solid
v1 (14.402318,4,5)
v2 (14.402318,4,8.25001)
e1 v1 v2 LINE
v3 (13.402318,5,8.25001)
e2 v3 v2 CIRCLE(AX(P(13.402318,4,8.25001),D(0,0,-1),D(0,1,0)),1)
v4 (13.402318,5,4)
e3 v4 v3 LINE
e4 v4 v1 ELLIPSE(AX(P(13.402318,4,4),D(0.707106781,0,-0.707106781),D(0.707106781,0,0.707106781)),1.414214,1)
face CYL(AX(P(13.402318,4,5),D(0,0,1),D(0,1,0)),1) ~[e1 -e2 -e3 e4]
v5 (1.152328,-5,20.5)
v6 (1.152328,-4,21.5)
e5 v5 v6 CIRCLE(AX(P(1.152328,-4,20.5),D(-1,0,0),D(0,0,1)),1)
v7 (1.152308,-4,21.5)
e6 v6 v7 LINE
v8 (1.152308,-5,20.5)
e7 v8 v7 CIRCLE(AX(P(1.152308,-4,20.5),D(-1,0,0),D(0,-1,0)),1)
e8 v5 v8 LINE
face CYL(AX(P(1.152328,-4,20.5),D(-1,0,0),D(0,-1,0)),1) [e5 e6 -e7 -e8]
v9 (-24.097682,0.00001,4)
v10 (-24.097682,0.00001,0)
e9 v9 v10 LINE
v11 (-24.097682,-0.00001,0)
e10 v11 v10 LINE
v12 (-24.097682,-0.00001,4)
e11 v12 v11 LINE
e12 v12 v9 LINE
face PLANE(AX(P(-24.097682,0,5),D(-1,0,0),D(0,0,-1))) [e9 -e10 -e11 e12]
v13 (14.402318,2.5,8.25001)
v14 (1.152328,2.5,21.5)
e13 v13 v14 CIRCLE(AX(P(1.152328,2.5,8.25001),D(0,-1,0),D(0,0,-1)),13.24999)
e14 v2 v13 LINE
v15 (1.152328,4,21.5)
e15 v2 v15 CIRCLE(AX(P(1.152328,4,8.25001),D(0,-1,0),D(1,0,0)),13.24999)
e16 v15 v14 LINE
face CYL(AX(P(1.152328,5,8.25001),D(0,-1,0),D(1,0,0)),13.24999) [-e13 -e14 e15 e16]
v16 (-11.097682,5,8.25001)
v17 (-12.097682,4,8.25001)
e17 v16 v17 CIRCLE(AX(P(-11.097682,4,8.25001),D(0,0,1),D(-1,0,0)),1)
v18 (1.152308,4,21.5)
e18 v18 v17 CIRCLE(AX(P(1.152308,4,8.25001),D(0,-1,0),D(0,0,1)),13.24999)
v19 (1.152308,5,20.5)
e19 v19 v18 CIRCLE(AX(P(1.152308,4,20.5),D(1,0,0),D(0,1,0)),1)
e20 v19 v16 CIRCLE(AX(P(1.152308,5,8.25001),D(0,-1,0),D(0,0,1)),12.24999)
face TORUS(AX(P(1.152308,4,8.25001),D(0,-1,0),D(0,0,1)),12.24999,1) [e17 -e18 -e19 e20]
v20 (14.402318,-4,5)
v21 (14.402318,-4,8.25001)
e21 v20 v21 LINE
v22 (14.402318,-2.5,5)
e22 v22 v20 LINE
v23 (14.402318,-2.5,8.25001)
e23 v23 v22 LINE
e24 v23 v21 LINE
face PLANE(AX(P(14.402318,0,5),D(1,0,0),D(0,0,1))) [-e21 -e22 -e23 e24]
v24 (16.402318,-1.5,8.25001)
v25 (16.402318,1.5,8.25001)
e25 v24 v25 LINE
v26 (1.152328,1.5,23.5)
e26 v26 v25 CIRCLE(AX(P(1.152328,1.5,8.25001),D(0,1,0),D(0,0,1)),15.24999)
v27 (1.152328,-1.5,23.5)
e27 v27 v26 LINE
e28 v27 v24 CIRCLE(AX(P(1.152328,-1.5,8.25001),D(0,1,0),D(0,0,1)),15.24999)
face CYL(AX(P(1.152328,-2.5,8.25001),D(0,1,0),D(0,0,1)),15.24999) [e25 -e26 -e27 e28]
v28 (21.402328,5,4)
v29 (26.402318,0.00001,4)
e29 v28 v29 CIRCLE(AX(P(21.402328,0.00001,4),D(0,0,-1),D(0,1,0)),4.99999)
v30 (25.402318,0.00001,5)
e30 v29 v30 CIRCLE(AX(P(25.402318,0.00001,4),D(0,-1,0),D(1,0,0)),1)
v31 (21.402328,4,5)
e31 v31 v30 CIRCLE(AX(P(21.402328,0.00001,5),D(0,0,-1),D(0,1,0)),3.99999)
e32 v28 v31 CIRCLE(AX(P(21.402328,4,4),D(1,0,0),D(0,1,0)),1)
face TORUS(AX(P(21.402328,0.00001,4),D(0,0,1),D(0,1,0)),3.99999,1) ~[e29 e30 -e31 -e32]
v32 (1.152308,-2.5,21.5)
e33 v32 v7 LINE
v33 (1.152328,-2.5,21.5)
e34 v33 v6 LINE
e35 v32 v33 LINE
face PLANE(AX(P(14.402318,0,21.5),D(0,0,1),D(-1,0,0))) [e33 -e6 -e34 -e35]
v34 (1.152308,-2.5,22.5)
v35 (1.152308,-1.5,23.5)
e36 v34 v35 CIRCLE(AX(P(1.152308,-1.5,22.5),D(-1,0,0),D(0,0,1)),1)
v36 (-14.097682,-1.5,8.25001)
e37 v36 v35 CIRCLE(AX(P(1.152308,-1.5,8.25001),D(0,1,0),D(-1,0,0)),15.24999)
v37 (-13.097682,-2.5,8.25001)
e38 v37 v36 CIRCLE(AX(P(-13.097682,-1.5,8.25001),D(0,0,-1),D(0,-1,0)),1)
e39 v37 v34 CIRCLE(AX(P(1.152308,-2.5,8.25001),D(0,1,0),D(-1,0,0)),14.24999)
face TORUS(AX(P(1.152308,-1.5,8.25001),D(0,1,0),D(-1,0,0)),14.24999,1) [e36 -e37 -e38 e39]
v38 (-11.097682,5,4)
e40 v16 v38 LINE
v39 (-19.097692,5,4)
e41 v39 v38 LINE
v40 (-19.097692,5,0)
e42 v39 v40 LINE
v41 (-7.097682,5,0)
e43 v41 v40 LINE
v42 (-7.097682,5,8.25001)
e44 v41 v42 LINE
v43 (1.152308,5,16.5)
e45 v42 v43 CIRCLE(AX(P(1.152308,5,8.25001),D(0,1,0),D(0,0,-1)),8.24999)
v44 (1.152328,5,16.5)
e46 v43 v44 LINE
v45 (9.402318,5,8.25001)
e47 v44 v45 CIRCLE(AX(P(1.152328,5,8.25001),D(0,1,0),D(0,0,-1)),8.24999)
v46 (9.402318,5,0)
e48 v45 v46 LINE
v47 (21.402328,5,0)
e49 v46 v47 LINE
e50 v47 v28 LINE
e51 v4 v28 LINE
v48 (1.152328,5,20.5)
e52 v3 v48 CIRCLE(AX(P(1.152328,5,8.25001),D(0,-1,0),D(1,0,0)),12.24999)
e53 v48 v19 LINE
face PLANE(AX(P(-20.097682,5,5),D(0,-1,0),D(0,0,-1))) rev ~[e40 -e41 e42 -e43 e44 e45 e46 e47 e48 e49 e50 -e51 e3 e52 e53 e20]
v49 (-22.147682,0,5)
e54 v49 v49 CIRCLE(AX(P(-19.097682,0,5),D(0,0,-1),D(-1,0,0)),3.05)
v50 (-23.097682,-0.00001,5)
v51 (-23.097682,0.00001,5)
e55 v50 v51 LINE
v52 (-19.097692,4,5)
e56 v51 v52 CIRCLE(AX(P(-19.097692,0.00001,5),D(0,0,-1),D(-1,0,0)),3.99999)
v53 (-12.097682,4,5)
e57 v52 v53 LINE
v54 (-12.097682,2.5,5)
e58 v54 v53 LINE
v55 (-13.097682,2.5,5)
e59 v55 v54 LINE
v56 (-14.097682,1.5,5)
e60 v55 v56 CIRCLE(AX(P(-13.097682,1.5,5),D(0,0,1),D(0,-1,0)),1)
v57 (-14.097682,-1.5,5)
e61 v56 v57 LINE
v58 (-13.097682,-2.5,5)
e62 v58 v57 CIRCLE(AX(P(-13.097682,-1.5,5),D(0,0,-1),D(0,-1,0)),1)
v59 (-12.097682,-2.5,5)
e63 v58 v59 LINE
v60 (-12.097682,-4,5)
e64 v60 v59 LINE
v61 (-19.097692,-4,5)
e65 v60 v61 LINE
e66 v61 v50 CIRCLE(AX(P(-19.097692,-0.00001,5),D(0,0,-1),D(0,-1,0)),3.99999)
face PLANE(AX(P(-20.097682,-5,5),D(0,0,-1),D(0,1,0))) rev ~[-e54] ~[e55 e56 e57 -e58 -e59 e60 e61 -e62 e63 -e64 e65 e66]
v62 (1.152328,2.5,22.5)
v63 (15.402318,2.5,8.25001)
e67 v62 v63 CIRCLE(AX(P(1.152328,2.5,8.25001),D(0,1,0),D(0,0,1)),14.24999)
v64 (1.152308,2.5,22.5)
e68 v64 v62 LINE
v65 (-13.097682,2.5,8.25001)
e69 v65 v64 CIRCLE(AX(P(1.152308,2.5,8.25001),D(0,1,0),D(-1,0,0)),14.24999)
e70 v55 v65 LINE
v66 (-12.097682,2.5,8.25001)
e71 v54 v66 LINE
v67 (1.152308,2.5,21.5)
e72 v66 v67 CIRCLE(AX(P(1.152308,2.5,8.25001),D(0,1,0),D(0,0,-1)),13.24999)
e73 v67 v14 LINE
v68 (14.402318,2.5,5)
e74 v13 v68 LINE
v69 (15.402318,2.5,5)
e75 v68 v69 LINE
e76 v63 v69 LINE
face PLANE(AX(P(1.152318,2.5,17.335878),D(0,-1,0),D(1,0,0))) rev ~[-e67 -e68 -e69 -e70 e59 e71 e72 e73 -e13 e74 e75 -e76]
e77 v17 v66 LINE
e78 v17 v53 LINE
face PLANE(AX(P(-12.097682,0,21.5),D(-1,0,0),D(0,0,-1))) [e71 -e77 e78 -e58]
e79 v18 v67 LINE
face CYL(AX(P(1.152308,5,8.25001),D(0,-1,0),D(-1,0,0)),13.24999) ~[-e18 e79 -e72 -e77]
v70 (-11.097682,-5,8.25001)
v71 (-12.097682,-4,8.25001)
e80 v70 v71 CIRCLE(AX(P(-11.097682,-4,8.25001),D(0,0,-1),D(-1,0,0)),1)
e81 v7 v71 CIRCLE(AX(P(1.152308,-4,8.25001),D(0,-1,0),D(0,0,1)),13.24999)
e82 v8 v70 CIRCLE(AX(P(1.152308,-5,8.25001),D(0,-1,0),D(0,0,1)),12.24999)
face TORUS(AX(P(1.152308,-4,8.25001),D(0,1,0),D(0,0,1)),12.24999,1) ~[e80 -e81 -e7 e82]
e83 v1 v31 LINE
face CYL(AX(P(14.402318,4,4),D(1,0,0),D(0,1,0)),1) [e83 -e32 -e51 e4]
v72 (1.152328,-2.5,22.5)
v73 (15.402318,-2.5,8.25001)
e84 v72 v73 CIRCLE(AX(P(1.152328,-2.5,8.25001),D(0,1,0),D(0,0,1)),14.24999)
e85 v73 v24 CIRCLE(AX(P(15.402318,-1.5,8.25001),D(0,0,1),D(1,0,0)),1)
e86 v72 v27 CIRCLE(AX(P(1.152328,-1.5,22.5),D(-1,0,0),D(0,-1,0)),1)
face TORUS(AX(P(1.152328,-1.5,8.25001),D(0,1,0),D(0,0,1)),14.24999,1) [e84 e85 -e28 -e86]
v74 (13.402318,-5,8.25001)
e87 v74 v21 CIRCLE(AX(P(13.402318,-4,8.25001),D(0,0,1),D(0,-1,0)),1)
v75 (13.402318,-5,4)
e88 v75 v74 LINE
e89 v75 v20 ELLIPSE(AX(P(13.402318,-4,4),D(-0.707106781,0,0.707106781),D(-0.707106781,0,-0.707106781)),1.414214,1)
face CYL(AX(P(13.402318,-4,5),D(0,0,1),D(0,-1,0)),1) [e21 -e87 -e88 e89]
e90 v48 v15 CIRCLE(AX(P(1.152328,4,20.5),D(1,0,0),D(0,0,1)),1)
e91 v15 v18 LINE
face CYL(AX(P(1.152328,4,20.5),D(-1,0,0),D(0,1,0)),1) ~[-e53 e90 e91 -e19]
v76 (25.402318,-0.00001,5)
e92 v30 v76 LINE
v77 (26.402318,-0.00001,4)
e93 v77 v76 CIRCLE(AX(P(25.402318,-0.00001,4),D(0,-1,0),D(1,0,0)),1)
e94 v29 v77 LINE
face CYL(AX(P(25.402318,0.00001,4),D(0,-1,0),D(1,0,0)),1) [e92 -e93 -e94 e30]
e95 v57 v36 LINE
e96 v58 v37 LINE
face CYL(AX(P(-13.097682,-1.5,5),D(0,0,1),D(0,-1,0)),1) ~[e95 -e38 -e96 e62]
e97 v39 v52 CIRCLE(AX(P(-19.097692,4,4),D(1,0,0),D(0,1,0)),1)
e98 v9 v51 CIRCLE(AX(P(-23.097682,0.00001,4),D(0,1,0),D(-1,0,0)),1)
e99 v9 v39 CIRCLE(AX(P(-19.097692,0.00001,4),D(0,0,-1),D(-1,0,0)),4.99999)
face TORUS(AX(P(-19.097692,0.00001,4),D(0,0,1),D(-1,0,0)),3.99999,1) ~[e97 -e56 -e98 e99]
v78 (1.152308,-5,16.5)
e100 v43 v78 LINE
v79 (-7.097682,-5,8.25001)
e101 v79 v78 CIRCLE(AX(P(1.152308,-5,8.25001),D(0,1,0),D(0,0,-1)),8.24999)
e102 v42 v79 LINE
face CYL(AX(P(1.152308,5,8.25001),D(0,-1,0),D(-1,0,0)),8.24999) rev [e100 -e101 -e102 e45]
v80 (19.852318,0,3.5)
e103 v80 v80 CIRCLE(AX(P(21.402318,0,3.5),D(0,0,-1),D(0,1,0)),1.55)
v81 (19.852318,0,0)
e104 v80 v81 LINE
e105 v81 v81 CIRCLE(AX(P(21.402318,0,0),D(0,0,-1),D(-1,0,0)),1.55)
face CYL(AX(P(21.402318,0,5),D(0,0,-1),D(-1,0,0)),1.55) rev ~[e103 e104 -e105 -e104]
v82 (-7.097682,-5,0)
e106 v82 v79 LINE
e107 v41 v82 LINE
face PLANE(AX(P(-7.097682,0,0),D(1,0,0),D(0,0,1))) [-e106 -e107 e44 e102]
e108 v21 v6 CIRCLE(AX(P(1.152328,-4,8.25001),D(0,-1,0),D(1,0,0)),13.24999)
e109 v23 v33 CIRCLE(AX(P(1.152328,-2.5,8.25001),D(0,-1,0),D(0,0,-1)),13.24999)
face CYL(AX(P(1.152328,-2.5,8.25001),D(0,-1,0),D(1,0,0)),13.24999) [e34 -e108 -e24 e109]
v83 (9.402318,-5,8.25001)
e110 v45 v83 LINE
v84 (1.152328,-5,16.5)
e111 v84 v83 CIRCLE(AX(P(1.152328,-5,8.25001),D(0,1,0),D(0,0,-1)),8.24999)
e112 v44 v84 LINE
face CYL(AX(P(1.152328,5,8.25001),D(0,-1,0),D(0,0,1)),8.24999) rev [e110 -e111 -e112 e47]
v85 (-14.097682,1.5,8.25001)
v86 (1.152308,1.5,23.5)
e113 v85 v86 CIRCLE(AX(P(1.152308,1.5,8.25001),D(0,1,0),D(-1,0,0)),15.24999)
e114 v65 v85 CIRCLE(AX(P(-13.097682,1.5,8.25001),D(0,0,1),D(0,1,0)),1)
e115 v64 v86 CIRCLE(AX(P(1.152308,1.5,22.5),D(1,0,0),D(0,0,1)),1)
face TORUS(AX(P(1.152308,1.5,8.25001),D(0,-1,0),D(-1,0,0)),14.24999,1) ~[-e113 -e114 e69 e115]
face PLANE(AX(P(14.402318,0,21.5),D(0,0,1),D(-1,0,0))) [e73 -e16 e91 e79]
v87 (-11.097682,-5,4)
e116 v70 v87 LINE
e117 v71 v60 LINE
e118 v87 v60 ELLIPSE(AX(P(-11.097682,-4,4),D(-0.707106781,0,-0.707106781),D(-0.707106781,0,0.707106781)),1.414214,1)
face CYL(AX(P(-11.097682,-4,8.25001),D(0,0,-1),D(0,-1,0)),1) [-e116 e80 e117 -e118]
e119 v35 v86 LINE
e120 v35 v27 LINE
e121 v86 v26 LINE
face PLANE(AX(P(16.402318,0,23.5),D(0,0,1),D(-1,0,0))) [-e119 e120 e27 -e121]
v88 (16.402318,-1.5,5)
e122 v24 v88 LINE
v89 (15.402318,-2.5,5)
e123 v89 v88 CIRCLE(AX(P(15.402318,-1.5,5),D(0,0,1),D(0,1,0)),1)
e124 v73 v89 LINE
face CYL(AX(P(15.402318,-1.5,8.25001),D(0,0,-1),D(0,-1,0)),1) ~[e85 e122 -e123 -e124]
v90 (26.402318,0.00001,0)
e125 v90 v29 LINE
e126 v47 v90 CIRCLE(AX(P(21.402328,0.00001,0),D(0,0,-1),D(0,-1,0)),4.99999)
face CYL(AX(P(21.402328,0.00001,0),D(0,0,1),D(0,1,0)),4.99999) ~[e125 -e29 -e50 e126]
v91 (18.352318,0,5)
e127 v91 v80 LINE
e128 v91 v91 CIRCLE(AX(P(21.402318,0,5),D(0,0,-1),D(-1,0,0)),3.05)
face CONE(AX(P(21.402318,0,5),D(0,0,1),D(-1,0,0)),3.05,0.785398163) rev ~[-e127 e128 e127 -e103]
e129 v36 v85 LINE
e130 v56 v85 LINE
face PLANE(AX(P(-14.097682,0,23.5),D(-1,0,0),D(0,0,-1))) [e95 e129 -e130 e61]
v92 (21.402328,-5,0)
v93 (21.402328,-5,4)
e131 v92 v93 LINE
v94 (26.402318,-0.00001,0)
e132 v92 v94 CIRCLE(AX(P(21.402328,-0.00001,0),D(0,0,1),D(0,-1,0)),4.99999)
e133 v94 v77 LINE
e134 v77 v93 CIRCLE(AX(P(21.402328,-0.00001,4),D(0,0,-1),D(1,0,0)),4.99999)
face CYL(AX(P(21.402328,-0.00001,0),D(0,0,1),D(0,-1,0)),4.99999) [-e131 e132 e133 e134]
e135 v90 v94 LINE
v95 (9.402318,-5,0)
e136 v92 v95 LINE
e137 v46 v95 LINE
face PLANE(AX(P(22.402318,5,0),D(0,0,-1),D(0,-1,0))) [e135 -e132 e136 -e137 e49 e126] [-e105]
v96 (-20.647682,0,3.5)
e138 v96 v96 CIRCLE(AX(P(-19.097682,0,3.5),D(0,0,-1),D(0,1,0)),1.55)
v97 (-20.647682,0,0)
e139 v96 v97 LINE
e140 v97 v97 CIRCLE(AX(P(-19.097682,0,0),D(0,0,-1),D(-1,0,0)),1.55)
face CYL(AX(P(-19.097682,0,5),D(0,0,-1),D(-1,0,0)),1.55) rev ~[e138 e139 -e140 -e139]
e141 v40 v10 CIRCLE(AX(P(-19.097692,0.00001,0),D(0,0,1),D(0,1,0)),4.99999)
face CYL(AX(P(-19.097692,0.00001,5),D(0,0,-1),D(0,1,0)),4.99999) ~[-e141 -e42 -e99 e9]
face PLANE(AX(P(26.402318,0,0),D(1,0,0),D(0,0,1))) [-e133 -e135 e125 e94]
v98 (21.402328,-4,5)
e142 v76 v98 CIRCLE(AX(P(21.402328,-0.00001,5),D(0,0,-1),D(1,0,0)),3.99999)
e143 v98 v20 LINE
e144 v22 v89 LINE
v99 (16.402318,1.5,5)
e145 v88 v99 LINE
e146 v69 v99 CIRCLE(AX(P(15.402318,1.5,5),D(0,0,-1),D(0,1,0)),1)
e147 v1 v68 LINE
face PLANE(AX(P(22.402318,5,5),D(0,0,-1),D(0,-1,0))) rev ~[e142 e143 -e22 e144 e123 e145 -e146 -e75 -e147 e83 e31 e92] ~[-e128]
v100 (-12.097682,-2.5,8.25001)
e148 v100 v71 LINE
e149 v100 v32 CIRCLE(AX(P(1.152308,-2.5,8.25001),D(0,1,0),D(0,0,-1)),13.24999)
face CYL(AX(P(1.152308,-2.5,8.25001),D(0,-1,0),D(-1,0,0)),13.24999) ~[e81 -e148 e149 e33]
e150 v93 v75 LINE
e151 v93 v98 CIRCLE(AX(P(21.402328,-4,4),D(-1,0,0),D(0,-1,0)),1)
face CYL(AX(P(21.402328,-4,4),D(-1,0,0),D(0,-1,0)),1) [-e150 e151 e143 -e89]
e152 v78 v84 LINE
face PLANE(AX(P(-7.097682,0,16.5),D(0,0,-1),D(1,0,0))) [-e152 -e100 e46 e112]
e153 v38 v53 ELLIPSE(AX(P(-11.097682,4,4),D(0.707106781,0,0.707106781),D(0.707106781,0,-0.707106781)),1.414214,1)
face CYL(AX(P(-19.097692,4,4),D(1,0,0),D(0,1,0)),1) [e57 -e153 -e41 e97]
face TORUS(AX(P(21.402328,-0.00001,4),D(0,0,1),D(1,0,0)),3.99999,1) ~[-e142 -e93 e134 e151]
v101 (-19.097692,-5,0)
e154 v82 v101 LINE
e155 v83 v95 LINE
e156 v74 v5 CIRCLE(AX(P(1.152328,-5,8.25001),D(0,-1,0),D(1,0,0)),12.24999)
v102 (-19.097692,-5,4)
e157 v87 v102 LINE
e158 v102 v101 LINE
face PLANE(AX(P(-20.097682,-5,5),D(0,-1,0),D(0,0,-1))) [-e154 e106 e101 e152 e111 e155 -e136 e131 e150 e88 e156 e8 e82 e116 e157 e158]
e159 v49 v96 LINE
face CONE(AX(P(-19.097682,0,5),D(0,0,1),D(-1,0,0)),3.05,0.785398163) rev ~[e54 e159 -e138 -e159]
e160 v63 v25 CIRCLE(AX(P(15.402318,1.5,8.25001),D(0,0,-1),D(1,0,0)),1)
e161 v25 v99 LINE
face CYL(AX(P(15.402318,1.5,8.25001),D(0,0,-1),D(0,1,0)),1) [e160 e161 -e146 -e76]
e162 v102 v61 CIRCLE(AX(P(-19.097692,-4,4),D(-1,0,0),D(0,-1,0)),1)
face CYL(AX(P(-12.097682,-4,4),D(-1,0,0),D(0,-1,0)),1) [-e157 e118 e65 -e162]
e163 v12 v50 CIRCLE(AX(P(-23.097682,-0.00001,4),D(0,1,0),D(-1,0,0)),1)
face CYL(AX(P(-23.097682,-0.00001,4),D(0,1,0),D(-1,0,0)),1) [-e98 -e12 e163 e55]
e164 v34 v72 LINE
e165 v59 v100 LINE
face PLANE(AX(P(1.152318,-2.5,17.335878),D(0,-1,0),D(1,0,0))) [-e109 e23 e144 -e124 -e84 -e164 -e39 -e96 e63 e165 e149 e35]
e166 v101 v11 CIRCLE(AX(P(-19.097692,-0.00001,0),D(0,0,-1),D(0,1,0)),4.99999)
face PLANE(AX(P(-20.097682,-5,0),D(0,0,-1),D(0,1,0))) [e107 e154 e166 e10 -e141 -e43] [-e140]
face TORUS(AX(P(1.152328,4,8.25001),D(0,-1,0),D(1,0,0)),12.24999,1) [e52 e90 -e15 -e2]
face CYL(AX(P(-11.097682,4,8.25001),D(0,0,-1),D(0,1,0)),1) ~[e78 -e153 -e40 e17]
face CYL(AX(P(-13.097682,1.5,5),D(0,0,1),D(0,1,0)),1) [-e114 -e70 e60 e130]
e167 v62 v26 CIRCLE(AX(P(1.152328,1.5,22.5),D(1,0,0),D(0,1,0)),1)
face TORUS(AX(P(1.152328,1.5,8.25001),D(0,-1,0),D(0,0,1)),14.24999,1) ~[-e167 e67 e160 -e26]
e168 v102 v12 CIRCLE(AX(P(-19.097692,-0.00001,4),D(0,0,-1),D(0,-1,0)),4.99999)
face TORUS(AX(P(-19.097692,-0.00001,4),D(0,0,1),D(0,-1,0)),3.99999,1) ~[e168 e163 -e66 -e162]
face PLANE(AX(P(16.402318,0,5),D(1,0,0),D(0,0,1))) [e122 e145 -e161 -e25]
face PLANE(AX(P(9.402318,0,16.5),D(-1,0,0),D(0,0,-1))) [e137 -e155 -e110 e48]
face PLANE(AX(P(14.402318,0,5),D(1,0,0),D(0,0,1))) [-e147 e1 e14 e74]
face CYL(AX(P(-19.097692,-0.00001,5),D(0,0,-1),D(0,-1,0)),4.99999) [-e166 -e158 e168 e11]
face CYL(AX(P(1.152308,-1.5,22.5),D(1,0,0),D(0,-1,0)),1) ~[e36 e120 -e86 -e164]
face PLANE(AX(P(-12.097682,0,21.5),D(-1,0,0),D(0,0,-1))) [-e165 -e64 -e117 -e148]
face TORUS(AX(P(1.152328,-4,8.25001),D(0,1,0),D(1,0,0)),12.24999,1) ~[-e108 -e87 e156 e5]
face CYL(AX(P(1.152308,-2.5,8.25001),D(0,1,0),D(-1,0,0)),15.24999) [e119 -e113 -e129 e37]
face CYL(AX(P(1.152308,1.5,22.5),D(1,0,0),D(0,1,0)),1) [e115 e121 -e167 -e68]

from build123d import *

# Parameters (mm, degrees)
F1_DEPTH        = 5
F2_DEPTH        = 2.5
F3_R            = 8.24999
F4_R            = 13.24999
F5_R            = 13.24999
F6_R            = 15.24999
F7_DEPTH        = 4
F8_DEPTH        = 4
F9_R            = 4.99999
F11_D           = 3.1
F11_CSINK_D     = 6.1
F11_CSINK_ANGLE = 90
F13_D           = 3.1
F13_CSINK_D     = 6.1
F13_CSINK_ANGLE = 90
F14_R           = 1


# Not quite as in the source:
# - a fillet or chamfer is up to 0.001 mm smaller than in the source, because OpenCascade refuses the exact size


with BuildPart() as f1:
    # F0 (on Front) → F1 (new body, symmetric)
    with BuildSketch(Plane.XZ):
        Polygon((-20.0976822525, 0), (-7.0976822525, 0), (-7.0976822525, 8.25), (-7.0976822525, 16.5), (9.4023177475, 16.5), (9.4023177475, 0), (22.4023177475, 0), (22.4023177475, 5), (16.4023177475, 5), (14.4023177475, 5), (14.4023177475, 21.5), (-12.0976822525, 21.5), (-12.0976822525, 5), (-14.0976822525, 5), (-20.0976822525, 5), align=None)
    extrude(amount=F1_DEPTH, both=True)

    # F0 (on Front) → F2 (join, symmetric)
    with BuildSketch(Plane.XZ):
        Polygon((-14.0976822525, 23.5), (-14.0976822525, 5), (-12.0976822525, 5), (-12.0976822525, 21.5), (14.4023177475, 21.5), (14.4023177475, 5), (16.4023177475, 5), (16.4023177475, 23.5), align=None)
    extrude(amount=F2_DEPTH, both=True)

    # F3 (radius 8.25 in the source; OpenCascade refuses exactly that, so slightly less here)
    f3_edges = [f1.edges().sort_by_distance(p)[0] for p in [
        (-7.097682, 0, 16.5),
        (9.402318, 0, 16.5),
    ]]
    fillet(f3_edges, radius=F3_R)

    # F4 (radius 13.25 in the source; OpenCascade refuses exactly that, so slightly less here)
    f4_edges = [f1.edges().sort_by_distance(p)[0] for p in [
        (14.402318, -3.75, 21.5),
        (-12.097682, -3.75, 21.5),
    ]]
    fillet(f4_edges, radius=F4_R)

    # F5 (radius 13.25 in the source; OpenCascade refuses exactly that, so slightly less here)
    f5_edges = [f1.edges().sort_by_distance(p)[0] for p in [
        (14.402318, 3.75, 21.5),
        (-12.097682, 3.75, 21.5),
    ]]
    fillet(f5_edges, radius=F5_R)

    # F6 (radius 15.25 in the source; OpenCascade refuses exactly that, so slightly less here)
    f6_edges = [f1.edges().sort_by_distance(p)[0] for p in [
        (16.402318, 0, 23.5),
        (-14.097682, 0, 23.5),
    ]]
    fillet(f6_edges, radius=F6_R)

    # F7 (add): a face of the model
    f7_faces = [f1.faces().sort_by_distance(p)[0] for p in [
        (22.4023177475, 0, 2.5),
    ]]
    extrude(f7_faces, amount=F7_DEPTH)

    # F8 (add): a face of the model
    f8_faces = [f1.faces().sort_by_distance(p)[0] for p in [
        (-20.0976822525, 0, 2.5),
    ]]
    extrude(f8_faces, amount=F8_DEPTH)

    # F9 (radius 5 in the source; OpenCascade refuses exactly that, so slightly less here)
    f9_edges = [f1.edges().sort_by_distance(p)[0] for p in [
        (26.402318, -5, 2.5),
        (26.402318, 5, 2.5),
        (-24.097682, -5, 2.5),
        (-24.097682, 5, 2.5),
    ]]
    fillet(f9_edges, radius=F9_R)

    # F11 (through all)
    with Locations(Plane.XY.offset(5)):
        with Locations((-19.0976822525, 0)):
            CounterSinkHole(F11_D / 2, F11_CSINK_D / 2, counter_sink_angle=F11_CSINK_ANGLE)

    # F13 (through all)
    with Locations(Plane.XY.offset(5)):
        with Locations((21.4023177475, 0)):
            CounterSinkHole(F13_D / 2, F13_CSINK_D / 2, counter_sink_angle=F13_CSINK_ANGLE)

    # F14
    f14_edges = [f1.edges().sort_by_distance(p)[0] for p in [
        (-9.631064, -2.5, 19.033381),
        (-9.631064, 2.5, 19.033381),
        (17.902323, 5, 5),
        (-15.597687, 5, 5),
        (-12.097682, 5, 6.625005),
        (-8.21685, 5, 17.619168),
        (1.152318, 5, 21.5),
        (10.521486, 5, 17.619168),
        (14.402318, 5, 6.625005),
        (-22.633219, 3.535537, 5),
        (-24.097682, 0, 5),
        (-22.633219, -3.535537, 5),
        (-15.597687, -5, 5),
        (17.902323, -5, 5),
        (24.937855, -3.535537, 5),
        (26.402318, 0, 5),
        (24.937855, 3.535537, 5),
        (-14.097682, 2.5, 6.625005),
        (1.152318, 2.5, 23.5),
        (11.935699, 2.5, 19.033381),
        (16.402318, 2.5, 6.625005),
        (-14.097682, -2.5, 6.625005),
        (-12.097682, -5, 6.625005),
        (-8.21685, -5, 17.619168),
        (1.152318, -5, 21.5),
        (10.521486, -5, 17.619168),
        (14.402318, -5, 6.625005),
        (1.152318, -2.5, 23.5),
        (11.935699, -2.5, 19.033381),
        (16.402318, -2.5, 6.625005),
    ]]
    fillet(f14_edges, radius=F14_R)


solid = f1.part
